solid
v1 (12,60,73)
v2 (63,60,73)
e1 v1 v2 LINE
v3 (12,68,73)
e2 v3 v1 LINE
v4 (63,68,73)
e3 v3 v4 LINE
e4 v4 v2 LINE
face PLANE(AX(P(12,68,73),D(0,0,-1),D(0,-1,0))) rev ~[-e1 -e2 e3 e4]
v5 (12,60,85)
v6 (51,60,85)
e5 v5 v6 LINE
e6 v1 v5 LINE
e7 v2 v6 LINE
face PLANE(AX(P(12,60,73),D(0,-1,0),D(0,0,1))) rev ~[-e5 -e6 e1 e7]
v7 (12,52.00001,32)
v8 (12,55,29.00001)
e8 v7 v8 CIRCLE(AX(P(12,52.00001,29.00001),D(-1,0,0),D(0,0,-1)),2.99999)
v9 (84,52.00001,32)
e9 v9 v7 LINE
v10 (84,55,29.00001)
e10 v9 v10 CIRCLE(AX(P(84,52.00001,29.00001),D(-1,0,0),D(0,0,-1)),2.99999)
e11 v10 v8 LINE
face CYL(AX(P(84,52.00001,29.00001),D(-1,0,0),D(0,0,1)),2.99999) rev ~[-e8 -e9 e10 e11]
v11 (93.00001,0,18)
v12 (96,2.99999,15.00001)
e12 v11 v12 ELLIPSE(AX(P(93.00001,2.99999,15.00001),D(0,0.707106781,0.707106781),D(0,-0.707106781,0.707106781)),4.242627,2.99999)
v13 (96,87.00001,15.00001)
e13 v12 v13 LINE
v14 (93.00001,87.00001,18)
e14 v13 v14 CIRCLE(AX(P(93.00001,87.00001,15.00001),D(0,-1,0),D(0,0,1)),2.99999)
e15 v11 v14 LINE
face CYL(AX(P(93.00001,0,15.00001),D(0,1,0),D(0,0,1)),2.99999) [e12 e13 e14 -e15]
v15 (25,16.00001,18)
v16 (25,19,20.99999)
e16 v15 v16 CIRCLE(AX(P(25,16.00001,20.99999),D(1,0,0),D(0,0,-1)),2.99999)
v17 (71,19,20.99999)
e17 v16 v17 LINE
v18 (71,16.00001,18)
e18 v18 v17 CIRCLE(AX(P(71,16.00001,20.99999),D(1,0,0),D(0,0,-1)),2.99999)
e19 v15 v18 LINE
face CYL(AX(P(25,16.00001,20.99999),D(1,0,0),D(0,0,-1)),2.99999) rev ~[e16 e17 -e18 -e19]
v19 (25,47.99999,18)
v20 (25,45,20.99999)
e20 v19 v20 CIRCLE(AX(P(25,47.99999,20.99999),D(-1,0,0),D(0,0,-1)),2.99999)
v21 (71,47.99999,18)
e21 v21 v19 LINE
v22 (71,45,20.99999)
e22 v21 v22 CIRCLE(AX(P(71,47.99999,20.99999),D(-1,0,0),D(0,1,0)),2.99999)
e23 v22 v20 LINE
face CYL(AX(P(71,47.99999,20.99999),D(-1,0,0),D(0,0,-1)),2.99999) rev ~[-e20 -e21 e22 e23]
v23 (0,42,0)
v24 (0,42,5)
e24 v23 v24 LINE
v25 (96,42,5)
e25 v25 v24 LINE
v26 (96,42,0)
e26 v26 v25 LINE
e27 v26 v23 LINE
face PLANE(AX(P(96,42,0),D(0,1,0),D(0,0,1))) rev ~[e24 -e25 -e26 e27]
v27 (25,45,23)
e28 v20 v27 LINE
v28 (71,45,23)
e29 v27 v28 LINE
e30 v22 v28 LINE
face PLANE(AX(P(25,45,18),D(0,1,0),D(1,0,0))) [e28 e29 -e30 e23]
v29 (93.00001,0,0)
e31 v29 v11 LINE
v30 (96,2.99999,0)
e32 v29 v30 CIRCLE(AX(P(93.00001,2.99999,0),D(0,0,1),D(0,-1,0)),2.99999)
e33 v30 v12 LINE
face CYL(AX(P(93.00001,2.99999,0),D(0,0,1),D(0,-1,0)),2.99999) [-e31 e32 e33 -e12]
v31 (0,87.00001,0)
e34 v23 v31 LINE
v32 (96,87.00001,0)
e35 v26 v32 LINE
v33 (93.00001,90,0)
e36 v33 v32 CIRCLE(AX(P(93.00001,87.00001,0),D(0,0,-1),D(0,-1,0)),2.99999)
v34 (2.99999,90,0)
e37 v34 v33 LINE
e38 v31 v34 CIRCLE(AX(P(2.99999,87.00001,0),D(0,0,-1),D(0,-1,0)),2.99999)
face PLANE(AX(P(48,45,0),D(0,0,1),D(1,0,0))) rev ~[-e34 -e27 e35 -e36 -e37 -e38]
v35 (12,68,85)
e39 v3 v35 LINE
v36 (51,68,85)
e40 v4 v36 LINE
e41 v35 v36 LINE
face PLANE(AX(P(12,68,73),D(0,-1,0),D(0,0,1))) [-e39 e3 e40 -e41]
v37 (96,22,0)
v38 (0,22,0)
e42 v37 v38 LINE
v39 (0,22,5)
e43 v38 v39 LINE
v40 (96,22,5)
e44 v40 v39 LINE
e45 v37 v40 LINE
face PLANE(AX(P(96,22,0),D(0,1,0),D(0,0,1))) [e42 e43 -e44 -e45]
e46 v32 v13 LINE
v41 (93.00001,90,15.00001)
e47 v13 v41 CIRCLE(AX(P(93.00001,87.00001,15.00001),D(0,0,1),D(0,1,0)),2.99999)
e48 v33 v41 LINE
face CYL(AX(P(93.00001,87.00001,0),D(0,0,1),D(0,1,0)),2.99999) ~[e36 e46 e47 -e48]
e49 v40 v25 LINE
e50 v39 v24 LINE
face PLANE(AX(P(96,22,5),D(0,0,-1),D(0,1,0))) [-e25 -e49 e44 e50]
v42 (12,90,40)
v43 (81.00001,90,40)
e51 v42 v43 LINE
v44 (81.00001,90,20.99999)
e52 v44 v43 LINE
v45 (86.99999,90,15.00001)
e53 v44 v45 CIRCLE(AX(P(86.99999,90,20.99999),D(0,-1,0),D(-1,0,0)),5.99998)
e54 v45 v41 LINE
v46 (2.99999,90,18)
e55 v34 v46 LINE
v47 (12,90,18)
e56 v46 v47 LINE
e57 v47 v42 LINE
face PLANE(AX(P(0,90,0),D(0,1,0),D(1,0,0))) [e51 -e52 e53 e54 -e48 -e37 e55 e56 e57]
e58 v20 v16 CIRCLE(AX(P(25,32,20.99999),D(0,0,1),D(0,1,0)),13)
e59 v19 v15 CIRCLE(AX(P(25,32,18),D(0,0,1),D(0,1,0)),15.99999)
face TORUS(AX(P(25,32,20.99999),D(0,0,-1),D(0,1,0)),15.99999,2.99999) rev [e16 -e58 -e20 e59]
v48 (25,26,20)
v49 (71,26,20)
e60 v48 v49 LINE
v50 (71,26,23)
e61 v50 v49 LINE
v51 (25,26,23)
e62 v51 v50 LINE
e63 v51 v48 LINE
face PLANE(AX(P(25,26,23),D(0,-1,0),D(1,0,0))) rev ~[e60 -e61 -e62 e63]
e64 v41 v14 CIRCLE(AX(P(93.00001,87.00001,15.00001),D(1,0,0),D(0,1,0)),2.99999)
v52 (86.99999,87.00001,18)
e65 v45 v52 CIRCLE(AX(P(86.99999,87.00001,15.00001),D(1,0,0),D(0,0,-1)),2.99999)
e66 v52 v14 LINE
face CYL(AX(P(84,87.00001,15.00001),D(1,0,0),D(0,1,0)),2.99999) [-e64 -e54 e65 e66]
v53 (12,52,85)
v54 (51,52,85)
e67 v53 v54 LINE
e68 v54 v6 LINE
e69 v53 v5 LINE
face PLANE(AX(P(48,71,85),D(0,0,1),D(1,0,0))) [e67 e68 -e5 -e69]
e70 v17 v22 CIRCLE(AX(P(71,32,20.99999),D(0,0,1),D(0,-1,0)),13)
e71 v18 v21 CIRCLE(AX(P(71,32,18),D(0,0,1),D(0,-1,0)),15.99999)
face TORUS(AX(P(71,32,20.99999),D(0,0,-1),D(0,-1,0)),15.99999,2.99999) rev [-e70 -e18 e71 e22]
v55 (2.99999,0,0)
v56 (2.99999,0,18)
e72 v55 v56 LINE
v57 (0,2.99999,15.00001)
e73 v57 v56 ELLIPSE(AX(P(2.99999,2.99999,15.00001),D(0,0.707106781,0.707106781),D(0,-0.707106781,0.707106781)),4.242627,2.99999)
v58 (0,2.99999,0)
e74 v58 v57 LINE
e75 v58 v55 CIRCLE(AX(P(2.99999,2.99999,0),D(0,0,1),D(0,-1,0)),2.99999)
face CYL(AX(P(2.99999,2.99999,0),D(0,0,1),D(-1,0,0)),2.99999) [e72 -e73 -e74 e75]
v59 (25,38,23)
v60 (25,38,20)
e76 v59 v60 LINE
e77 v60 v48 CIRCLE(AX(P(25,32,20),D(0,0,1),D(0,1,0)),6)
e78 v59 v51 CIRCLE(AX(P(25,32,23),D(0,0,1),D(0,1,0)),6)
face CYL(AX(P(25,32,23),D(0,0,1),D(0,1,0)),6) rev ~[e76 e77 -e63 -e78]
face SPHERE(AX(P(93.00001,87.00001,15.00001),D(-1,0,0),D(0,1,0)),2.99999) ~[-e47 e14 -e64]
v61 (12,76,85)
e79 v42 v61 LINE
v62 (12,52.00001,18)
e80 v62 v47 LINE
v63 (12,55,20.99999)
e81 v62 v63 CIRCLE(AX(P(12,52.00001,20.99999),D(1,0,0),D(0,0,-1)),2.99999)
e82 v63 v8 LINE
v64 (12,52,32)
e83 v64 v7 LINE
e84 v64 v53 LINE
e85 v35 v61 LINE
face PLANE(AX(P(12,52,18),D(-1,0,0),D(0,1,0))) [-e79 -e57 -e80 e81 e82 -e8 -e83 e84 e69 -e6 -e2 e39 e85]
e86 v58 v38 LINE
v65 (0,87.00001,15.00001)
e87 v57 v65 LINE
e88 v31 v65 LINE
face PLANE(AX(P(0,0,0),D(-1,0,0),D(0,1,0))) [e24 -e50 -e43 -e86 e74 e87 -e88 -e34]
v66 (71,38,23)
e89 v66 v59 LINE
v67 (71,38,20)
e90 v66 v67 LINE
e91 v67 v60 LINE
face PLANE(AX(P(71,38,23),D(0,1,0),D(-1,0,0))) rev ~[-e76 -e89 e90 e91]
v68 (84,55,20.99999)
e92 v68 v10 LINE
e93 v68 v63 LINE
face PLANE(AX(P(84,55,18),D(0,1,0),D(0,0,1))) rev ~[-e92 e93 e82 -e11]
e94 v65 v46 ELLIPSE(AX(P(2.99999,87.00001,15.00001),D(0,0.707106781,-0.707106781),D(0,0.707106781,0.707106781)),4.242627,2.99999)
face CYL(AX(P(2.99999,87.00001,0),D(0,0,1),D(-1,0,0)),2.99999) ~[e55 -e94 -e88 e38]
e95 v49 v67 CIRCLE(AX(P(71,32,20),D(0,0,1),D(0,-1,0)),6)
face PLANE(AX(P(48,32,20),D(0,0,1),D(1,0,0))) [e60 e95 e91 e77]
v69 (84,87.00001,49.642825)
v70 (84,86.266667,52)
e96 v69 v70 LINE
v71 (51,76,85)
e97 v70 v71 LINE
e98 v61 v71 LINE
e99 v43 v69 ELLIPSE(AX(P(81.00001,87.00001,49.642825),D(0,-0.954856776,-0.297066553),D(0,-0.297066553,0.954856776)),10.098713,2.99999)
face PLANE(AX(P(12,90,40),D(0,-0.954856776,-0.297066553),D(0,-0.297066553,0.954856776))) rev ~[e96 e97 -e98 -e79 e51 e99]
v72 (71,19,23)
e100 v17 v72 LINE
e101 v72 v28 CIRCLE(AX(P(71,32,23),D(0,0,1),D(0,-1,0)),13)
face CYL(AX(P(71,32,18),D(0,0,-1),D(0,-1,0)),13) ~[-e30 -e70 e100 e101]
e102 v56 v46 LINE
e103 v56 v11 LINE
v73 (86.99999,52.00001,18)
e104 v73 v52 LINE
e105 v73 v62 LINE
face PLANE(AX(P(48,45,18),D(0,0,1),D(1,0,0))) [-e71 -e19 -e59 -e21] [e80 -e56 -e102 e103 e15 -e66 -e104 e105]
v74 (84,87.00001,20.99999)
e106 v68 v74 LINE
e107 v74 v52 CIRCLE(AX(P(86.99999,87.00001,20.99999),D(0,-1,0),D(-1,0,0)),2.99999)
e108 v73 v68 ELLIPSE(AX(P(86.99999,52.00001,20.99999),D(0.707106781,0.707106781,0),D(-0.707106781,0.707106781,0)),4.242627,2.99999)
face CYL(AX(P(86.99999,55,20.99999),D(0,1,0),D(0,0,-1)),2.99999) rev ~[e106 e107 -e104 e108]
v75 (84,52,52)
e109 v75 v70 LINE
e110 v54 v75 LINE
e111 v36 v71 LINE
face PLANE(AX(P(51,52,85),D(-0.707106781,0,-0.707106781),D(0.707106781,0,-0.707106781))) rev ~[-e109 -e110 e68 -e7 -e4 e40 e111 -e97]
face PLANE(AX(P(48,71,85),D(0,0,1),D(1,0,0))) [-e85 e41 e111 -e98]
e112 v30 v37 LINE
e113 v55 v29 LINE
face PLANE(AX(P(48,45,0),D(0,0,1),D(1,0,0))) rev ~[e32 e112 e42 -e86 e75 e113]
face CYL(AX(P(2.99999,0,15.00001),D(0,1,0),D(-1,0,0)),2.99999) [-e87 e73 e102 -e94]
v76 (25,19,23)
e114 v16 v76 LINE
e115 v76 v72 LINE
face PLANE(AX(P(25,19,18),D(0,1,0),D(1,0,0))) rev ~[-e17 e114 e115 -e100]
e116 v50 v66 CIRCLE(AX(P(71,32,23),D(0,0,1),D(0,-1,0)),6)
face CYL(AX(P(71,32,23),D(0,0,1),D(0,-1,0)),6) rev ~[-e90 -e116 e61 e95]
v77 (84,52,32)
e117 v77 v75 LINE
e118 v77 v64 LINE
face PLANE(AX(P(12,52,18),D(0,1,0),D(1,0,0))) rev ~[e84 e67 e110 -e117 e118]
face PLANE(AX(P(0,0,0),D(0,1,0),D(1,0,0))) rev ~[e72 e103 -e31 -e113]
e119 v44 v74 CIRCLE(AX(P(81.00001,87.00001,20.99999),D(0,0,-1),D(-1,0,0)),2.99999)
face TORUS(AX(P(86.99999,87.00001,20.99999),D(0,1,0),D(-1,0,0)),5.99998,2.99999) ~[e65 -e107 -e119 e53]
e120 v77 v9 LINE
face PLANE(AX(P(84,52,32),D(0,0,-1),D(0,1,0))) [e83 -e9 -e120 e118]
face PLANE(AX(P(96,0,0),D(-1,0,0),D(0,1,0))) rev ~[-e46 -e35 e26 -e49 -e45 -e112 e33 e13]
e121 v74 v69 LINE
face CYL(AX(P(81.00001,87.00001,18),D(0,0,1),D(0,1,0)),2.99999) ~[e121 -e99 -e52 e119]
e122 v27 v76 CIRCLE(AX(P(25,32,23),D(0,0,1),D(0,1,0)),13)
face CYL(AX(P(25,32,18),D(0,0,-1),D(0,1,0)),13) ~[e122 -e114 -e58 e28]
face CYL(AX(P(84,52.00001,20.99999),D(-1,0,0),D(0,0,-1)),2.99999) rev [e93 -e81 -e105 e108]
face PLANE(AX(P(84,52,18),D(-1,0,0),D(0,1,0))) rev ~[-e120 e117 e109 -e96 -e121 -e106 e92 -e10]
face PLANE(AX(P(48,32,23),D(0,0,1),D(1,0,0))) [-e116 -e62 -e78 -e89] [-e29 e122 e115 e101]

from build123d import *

# Parameters (mm, degrees)
F0_W      = 96
F0_H      = 90
F1_DEPTH  = 18
F2_W      = 72
F2_H      = 38
F4_DEPTH  = 67
F6_DEPTH  = 38
F7_W      = 8
F7_H      = 12
F8_DEPTH  = 51.001
F10_DEPTH = 72.001
F11_W     = 20
F11_H     = 5
F12_DEPTH = 96
F13_W     = 46
F13_H     = 26
F14_DEPTH = 5
F16_DEPTH = 3
F17_W     = 3
F17_H     = 14
F18_DEPTH = 72
F19_R     = 2.99999


# Not quite as in the source:
# - a fillet or chamfer is up to 0.001 mm smaller than in the source, because OpenCascade refuses the exact size


with BuildPart() as f1:
    # F0 (on Top) → F1 (new body)
    with BuildSketch(Plane.XY):
        with Locations((48, 45)):
            Rectangle(F0_W, F0_H)
    extrude(amount=F1_DEPTH)

    # F2 (on face) → F4 (join, through all)
    with BuildSketch(Plane.XY.offset(18)):
        with Locations((48, 71)):
            Rectangle(F2_W, F2_H)
    extrude(amount=F4_DEPTH)

    # F5 (on face) → F6 (cut)
    with BuildSketch(Plane.XZ.offset(-52)):
        Polygon((84, 52), (84, 85), (51, 85), align=None)
    extrude(amount=-F6_DEPTH, mode=Mode.SUBTRACT)

    # F7 (on face) → F8 (cut, through all)
    with BuildSketch(Plane(origin=(12, 0, 0), x_dir=(0, -1, 0), z_dir=(-1, 0, 0))):
        with Locations((-64, 79)):
            Rectangle(F7_W, F7_H)
    extrude(amount=-F8_DEPTH, mode=Mode.SUBTRACT)

    # F9 (on face) → F10 (cut, through all)
    with BuildSketch(Plane(origin=(12, 0, 0), x_dir=(0, -1, 0), z_dir=(-1, 0, 0))):
        Polygon((-76, 85), (-90, 85), (-90, 40), align=None)
    extrude(amount=-F10_DEPTH, mode=Mode.SUBTRACT)

    # F11 (on face) → F12 (cut, through all)
    with BuildSketch(Plane.YZ.offset(96)):
        with Locations((32, 2.5)):
            Rectangle(F11_W, F11_H)
    extrude(amount=-F12_DEPTH, mode=Mode.SUBTRACT)

    # F13 (on face) → F14 (join)
    with BuildSketch(Plane.XY.offset(18)):
        with Locations((48, 32)):
            Rectangle(F13_W, F13_H)
        with BuildLine():
            Line((25, 19), (25, 45))
            ThreePointArc((25, 45), (12, 32), (25, 19))
        make_face()
        with BuildLine():
            ThreePointArc((71, 19), (84, 32), (71, 45))
            Line((71, 45), (71, 19))
        make_face()
    extrude(amount=F14_DEPTH)

    # F15 (on face) → F16 (cut)
    with BuildSketch(Plane.XY.offset(23)):
        with BuildLine():
            ThreePointArc((25, 38), (19, 32), (25, 26))
            Line((25, 26), (71, 26))
            ThreePointArc((71, 26), (77, 32), (71, 38))
            Line((71, 38), (25, 38))
        make_face()
    extrude(amount=-F16_DEPTH, mode=Mode.SUBTRACT)

    # F17 (on face) → F18 (cut, through all)
    with BuildSketch(Plane.YZ.offset(84)):
        with Locations((53.5, 25)):
            Rectangle(F17_W, F17_H)
    extrude(amount=-F18_DEPTH, mode=Mode.SUBTRACT)

    # F19 (radius 3 in the source; OpenCascade refuses exactly that, so slightly less here)
    f19_edges = [f1.edges().sort_by_distance(p)[0] for p in [
        (48, 19, 18),
        (48, 55, 18),
        (48, 55, 32),
        (90, 90, 18),
        (96, 0, 9),
        (96, 90, 9),
        (0, 90, 9),
        (0, 0, 9),
        (0, 45, 18),
        (96, 45, 18),
        (84, 72.5, 18),
        (48, 45, 18),
        (84, 32, 18),
        (12, 32, 18),
        (84, 90, 29),
    ]]
    fillet(f19_edges, radius=F19_R)


solid = f1.part
